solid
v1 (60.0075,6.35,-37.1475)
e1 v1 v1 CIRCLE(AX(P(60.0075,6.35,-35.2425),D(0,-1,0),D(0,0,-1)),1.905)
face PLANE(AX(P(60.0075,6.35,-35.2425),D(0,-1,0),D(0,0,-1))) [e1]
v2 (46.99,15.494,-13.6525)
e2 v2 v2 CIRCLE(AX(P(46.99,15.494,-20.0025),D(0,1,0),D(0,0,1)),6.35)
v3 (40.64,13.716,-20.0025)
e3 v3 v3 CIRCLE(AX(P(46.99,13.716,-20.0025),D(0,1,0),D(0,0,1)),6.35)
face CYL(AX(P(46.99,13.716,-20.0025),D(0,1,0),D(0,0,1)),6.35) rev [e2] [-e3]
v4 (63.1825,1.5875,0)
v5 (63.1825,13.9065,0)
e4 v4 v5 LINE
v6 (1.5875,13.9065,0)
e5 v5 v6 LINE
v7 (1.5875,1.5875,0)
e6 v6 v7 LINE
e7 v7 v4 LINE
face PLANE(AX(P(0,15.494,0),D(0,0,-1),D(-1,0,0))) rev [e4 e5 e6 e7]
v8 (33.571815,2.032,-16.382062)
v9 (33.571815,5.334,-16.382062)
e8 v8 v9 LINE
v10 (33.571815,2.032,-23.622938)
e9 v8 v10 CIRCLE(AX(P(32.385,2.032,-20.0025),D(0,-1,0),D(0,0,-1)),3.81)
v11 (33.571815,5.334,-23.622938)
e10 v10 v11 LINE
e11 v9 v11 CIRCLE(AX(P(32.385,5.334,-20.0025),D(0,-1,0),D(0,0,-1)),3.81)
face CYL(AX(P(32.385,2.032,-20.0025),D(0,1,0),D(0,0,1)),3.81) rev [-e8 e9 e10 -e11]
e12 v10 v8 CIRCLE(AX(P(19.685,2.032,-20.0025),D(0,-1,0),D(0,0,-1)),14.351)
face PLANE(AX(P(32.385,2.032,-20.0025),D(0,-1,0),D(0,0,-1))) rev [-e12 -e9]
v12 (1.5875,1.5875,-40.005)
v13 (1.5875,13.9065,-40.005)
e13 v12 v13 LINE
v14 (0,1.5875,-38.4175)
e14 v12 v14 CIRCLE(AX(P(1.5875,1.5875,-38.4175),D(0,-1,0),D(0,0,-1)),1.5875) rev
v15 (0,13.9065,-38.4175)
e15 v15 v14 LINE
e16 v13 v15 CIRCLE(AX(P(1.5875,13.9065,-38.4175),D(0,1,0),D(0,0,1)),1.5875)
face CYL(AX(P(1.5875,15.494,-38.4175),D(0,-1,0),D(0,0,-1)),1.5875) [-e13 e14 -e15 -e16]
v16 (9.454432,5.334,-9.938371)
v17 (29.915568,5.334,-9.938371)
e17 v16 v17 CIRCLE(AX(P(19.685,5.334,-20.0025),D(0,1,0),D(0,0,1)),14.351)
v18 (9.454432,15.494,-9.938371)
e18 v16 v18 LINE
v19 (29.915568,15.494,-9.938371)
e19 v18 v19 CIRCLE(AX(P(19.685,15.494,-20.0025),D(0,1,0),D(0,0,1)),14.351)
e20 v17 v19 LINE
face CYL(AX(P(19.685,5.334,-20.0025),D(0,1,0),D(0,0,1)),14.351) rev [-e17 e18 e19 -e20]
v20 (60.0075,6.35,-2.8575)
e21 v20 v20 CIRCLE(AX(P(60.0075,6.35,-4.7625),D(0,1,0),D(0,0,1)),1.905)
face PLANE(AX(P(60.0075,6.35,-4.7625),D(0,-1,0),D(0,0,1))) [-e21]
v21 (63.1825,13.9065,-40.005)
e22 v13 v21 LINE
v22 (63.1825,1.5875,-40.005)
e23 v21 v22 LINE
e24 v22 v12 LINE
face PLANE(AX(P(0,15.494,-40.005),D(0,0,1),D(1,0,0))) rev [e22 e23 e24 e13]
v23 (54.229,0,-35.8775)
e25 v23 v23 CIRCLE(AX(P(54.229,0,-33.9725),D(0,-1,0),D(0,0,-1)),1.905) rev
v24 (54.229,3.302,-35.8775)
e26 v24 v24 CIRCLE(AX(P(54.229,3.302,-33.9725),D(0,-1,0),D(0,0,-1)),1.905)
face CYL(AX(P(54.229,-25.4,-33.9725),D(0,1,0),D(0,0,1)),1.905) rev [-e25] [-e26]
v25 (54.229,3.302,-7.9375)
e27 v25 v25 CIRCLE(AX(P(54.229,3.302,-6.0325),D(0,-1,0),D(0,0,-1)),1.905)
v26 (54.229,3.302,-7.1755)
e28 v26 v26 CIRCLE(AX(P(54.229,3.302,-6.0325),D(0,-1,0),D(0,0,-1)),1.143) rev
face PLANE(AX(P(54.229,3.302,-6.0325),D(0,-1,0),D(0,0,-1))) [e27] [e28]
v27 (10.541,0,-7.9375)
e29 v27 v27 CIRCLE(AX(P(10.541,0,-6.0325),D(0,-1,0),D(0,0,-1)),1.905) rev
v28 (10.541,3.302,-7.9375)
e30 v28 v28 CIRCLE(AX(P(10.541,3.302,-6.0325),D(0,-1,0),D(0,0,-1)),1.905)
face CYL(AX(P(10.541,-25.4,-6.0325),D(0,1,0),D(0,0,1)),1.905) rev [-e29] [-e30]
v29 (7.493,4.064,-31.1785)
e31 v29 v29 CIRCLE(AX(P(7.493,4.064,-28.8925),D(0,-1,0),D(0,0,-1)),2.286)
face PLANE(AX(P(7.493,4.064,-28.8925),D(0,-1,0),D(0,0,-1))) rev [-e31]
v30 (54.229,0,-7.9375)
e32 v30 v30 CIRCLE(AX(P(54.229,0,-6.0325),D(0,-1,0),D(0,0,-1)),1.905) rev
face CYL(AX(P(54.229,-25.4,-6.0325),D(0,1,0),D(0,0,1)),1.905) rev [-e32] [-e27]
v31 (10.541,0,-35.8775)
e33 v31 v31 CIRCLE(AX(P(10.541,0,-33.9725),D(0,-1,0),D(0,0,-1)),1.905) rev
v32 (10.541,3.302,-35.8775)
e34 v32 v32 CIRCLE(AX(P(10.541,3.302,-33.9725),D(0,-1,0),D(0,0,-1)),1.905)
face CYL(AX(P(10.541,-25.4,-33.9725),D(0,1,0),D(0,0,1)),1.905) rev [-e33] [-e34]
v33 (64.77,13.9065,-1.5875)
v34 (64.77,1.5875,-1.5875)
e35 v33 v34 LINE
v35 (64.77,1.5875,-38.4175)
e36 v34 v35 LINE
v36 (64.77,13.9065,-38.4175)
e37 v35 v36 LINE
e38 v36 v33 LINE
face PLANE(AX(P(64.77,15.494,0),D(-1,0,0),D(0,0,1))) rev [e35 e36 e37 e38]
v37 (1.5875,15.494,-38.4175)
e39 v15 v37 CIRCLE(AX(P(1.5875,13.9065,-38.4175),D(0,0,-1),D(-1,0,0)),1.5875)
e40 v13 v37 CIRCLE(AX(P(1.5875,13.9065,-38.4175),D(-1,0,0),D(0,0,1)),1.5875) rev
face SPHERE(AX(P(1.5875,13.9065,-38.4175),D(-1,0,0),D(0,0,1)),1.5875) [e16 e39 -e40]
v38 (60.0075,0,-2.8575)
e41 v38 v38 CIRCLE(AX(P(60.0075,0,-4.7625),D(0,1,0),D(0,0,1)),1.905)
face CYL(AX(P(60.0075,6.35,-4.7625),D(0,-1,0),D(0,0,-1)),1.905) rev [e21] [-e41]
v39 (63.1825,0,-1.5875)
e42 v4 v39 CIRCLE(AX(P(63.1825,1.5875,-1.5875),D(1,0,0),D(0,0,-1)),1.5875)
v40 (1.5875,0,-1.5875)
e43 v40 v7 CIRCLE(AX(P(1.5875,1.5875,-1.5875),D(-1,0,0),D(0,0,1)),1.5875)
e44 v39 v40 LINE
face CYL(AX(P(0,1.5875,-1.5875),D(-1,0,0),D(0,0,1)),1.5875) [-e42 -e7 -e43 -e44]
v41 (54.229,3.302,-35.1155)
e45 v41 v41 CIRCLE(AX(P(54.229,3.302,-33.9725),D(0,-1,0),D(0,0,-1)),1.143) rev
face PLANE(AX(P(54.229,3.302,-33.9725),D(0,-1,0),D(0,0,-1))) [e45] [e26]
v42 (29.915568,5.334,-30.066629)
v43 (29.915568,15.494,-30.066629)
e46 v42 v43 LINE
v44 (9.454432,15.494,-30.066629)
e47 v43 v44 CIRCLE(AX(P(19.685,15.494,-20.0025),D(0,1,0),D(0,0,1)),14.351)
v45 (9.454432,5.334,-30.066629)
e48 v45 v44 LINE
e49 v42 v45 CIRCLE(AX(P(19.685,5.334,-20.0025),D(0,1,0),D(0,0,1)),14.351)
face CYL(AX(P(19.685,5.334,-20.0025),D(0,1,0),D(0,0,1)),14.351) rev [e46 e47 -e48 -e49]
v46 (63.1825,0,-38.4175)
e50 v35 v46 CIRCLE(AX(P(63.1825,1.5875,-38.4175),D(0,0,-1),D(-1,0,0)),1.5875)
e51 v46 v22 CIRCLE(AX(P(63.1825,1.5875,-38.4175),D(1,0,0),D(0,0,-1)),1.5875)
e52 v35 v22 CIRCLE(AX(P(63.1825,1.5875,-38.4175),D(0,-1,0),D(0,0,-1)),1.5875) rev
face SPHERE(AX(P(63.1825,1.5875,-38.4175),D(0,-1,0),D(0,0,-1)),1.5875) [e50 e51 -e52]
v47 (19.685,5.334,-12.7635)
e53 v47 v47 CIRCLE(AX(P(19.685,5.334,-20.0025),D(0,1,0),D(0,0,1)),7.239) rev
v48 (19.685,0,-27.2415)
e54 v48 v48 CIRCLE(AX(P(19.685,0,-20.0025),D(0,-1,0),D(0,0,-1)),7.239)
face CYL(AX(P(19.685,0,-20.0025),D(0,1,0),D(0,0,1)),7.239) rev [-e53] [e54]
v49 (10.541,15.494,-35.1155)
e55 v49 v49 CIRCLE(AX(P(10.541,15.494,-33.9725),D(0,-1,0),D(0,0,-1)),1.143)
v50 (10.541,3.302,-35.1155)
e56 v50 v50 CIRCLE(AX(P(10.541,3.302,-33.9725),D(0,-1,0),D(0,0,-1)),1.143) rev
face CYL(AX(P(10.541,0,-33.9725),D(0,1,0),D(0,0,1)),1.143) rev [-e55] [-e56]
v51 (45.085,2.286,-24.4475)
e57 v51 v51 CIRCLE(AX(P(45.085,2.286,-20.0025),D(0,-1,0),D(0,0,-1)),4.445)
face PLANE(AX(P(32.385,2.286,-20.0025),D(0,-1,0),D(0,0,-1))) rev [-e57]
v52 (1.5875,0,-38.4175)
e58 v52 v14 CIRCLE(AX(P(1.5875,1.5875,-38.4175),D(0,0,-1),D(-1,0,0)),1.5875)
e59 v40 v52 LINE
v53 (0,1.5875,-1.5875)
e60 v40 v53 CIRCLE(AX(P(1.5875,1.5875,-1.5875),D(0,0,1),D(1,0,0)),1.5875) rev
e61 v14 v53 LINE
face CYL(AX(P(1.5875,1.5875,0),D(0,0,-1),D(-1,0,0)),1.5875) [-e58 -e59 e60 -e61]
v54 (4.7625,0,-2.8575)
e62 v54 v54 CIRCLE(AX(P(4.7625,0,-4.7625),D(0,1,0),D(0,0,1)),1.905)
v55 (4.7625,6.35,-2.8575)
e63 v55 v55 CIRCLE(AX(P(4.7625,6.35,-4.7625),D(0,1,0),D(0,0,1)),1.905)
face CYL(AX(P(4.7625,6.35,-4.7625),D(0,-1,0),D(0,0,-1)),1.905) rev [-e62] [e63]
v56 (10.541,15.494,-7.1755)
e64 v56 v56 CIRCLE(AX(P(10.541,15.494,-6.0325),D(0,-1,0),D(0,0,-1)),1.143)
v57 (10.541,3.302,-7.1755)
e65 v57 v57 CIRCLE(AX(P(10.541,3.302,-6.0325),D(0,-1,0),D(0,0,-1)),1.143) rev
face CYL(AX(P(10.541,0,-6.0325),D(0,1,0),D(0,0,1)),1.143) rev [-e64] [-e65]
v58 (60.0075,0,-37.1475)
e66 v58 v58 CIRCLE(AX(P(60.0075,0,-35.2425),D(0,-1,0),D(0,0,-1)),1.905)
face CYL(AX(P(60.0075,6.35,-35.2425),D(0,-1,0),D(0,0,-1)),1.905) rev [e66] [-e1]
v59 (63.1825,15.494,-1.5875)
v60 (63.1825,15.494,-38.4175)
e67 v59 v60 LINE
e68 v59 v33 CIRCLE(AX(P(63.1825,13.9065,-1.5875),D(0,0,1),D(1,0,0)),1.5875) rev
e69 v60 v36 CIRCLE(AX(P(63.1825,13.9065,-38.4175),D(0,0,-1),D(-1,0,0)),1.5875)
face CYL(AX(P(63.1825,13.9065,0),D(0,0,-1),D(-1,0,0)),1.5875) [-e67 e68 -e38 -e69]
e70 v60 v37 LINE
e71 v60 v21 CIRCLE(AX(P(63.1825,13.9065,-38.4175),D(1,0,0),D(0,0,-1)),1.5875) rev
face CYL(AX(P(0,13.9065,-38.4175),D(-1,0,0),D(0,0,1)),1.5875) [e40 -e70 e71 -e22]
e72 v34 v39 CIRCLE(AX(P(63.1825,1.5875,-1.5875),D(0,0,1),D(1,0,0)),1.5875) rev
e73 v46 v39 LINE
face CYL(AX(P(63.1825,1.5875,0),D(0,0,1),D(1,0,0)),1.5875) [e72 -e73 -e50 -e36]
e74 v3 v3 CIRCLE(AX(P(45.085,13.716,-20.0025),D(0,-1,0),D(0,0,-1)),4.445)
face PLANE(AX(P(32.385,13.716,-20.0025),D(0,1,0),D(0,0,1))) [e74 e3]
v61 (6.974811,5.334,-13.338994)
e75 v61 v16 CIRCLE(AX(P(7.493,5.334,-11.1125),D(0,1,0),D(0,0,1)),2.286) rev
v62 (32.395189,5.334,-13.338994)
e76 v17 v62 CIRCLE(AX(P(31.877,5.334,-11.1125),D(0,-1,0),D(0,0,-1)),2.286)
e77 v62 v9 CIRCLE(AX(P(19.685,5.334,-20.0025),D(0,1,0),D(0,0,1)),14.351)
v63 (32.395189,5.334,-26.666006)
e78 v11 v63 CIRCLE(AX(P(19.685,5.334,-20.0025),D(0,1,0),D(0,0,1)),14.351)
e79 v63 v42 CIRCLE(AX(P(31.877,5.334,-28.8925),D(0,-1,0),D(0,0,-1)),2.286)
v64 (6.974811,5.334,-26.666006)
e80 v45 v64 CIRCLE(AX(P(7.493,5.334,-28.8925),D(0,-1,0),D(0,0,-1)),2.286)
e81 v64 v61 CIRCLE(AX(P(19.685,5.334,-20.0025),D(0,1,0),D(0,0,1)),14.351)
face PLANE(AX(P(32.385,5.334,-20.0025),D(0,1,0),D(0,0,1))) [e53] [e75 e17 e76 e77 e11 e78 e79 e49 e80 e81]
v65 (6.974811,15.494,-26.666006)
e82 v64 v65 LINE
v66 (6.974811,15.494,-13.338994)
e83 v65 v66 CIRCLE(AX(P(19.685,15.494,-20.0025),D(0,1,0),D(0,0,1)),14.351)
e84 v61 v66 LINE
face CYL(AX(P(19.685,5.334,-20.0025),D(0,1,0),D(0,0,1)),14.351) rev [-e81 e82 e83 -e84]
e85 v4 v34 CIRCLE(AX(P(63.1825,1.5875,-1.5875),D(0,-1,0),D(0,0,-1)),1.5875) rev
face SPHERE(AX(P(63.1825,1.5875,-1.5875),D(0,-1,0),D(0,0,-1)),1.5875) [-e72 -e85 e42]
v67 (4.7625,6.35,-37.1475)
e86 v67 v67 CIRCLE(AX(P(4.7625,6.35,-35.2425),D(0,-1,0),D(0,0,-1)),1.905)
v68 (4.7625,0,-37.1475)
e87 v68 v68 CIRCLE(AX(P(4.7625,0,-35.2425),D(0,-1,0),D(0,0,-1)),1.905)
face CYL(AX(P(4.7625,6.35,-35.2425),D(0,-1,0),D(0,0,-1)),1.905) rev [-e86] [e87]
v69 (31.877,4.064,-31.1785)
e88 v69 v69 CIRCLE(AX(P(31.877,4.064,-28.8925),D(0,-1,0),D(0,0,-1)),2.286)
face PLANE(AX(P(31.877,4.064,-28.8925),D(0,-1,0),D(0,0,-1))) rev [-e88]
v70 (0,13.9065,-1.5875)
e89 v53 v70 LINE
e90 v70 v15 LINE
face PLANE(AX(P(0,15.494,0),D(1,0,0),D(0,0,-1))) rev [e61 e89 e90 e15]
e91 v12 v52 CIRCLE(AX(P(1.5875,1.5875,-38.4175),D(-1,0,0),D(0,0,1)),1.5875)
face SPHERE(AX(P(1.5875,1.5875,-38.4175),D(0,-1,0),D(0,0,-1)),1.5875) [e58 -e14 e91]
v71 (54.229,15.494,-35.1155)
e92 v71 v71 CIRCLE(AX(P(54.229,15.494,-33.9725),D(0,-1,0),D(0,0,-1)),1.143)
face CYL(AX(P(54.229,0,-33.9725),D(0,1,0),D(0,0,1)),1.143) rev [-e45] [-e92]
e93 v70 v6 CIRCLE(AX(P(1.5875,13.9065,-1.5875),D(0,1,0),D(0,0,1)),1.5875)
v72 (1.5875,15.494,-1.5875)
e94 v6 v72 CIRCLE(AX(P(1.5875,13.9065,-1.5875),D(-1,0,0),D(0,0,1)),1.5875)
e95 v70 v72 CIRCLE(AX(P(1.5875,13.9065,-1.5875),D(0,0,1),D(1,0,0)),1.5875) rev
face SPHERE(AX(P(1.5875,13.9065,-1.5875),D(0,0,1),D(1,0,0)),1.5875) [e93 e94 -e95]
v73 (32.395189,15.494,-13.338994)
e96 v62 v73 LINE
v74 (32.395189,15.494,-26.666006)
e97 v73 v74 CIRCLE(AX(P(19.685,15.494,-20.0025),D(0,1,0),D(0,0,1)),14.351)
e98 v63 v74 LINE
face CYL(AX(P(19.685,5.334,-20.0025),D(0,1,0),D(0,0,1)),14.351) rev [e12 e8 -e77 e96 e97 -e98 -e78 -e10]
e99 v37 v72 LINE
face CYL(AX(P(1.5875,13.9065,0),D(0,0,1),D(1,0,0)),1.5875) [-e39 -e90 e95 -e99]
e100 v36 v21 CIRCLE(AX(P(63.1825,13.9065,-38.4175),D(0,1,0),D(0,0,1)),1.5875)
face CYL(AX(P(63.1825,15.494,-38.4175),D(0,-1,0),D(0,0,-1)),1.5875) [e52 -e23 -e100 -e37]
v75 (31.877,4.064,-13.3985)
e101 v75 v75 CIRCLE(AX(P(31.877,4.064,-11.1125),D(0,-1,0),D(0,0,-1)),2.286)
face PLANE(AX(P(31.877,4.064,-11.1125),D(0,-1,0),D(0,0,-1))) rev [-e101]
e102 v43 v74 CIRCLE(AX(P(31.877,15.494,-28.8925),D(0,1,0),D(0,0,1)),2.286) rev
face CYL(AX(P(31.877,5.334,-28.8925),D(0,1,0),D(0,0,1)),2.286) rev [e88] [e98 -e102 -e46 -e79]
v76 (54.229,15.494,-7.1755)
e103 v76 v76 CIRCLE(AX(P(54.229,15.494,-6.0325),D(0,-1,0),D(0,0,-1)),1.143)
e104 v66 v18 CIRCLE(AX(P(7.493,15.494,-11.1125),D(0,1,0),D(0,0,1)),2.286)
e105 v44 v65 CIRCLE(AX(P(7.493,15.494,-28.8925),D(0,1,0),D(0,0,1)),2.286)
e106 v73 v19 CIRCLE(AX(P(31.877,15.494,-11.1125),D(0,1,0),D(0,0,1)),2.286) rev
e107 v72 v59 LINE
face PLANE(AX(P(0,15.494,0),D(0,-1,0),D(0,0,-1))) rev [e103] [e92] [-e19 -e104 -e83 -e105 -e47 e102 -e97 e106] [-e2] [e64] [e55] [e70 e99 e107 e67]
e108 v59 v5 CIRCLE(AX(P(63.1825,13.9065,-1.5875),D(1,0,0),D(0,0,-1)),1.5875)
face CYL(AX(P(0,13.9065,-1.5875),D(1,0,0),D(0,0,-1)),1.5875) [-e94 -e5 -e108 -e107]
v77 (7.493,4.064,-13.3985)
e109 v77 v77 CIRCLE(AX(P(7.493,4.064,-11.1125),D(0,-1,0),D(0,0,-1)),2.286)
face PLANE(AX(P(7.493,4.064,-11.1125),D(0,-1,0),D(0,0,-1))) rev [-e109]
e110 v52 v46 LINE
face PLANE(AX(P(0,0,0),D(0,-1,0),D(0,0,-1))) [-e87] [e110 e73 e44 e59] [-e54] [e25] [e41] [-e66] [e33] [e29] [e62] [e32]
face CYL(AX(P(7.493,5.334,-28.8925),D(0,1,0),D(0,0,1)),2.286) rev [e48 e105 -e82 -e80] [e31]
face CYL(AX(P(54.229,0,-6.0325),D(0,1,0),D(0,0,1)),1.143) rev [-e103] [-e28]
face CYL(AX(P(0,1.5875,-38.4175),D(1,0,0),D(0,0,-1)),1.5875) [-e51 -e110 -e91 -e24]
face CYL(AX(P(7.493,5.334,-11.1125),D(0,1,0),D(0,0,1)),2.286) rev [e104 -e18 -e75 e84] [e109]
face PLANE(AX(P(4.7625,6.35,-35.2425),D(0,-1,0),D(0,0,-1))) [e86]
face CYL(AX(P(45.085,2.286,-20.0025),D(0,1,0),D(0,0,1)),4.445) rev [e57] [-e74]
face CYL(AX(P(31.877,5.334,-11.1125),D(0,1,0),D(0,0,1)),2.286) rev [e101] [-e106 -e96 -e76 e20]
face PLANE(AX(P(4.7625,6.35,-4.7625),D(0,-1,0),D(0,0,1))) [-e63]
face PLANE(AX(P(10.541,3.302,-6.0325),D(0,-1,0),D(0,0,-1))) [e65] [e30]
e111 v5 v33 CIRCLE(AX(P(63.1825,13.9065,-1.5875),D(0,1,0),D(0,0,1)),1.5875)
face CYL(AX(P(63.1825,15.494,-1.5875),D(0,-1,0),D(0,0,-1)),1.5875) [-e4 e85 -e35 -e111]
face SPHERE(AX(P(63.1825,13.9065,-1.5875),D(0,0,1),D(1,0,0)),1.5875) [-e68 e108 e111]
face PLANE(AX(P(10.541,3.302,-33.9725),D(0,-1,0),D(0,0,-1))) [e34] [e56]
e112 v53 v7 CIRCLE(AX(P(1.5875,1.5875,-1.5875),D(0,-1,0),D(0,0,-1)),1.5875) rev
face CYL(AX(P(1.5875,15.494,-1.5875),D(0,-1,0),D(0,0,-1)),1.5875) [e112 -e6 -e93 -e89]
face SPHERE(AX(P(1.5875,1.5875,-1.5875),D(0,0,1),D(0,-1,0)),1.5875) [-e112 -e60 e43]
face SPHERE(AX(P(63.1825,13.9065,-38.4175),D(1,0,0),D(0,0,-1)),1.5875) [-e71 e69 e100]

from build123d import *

# Parameters (mm, degrees)
SKETCH1_W             = 64.77
SKETCH1_H             = 40.005
BOSS_EXTRUDE1_DEPTH   = 15.494
CAVITY1_START         = 5.334
CAVITY1_OUTLINE_R     = 1.143
CAVITY1_OUTLINE_R_2   = 4.445
CAVITY1_DEPTH         = 10.16
CAVITY1_2_OUTLINE_R   = 1.143
CAVITY1_2_OUTLINE_R_2 = 7.239
CAVITY1_2_DEPTH       = 5.334
CAVITY1_START_2       = 2.286
CAVITY1_3_OUTLINE_R   = 4.445
CAVITY1_3_DEPTH       = 3.048
CAVITY1_START_3       = 13.716
CAVITY1_4_DEPTH       = 1.778
CAVITY1_5_OUTLINE_R   = 1.905
CAVITY1_5_OUTLINE_R_2 = 1.143
CAVITY1_5_DEPTH       = 3.302
CAVITY1_START_4       = 4.064
CAVITY1_6_OUTLINE_R   = 2.286
CAVITY1_6_DEPTH       = 1.27
CAVITY1_START_5       = 2.032
CAVITY1_7_DEPTH       = 0.254
SKETCH3_R             = 1.905
CUT_EXTRUDE1_DEPTH    = 6.35
FILLET1_R             = 1.5875


# Read off the part's stored shape, not the designer's step: Cavity1
with BuildPart() as part:
    # Sketch1 → Boss-Extrude1 (new body)
    with BuildSketch(Plane(origin=(0, 0, 0), x_dir=(1, 0, 0), z_dir=(0, 1, 0))):
        with Locations((32.385, 20.0025)):
            Rectangle(SKETCH1_W, SKETCH1_H)
    extrude(amount=BOSS_EXTRUDE1_DEPTH)

    # Cavity1 outline → Cavity1 (cut)
    with BuildSketch(Plane(origin=(0, 0, 0), x_dir=(1, 0, 0), z_dir=(0, 1, 0)).offset(CAVITY1_START)):
        with Locations((10.541, 6.0325)):
            Circle(CAVITY1_OUTLINE_R)
        with BuildLine():
            ThreePointArc((9.454432496, 9.938371148), (19.685, 5.6515), (29.915567504, 9.938371148))
            ThreePointArc((29.915567504, 9.938371148), (33.724105214, 9.765652448), (32.395188518, 13.338994253))
            ThreePointArc((32.395188518, 13.338994253), (34.036, 20.0025), (32.395188518, 26.666005747))
            ThreePointArc((32.395188518, 26.666005747), (33.724105214, 30.239347552), (29.915567504, 30.066628852))
            ThreePointArc((29.915567504, 30.066628852), (19.685, 34.3535), (9.454432496, 30.066628852))
            ThreePointArc((9.454432496, 30.066628852), (5.645894786, 30.239347552), (6.974811482, 26.666005747))
            ThreePointArc((6.974811482, 26.666005747), (5.334, 20.0025), (6.974811482, 13.338994253))
            ThreePointArc((6.974811482, 13.338994253), (5.645894786, 9.765652448), (9.454432496, 9.938371148))
        make_face()
        with Locations((54.229, 6.0325)):
            Circle(CAVITY1_OUTLINE_R)
        with Locations((45.085, 20.0025)):
            Circle(CAVITY1_OUTLINE_R_2)
        with Locations((10.541, 33.9725)):
            Circle(CAVITY1_OUTLINE_R)
        with Locations((54.229, 33.9725)):
            Circle(CAVITY1_OUTLINE_R)
    extrude(amount=CAVITY1_DEPTH, mode=Mode.SUBTRACT)

    # Cavity1 2 outline → Cavity1 2 (cut)
    with BuildSketch(Plane(origin=(0, 0, 0), x_dir=(1, 0, 0), z_dir=(0, 1, 0))):
        with Locations((10.541, 6.0325)):
            Circle(CAVITY1_2_OUTLINE_R)
        with Locations((54.229, 6.0325)):
            Circle(CAVITY1_2_OUTLINE_R)
        with Locations((10.541, 33.9725)):
            Circle(CAVITY1_2_OUTLINE_R)
        with Locations((54.229, 33.9725)):
            Circle(CAVITY1_2_OUTLINE_R)
        with Locations((19.685, 20.0025)):
            Circle(CAVITY1_2_OUTLINE_R_2)
    extrude(amount=CAVITY1_2_DEPTH, mode=Mode.SUBTRACT)

    # Cavity1 3 outline → Cavity1 3 (cut)
    with BuildSketch(Plane(origin=(0, 0, 0), x_dir=(1, 0, 0), z_dir=(0, 1, 0)).offset(CAVITY1_START_2)):
        with BuildLine():
            ThreePointArc((33.571815, 23.62293784), (28.575, 20.0025), (33.571815, 16.38206216))
            ThreePointArc((33.571815, 16.38206216), (34.036, 20.0025), (33.571815, 23.62293784))
        make_face()
        with Locations((45.085, 20.0025)):
            Circle(CAVITY1_3_OUTLINE_R)
    extrude(amount=CAVITY1_3_DEPTH, mode=Mode.SUBTRACT)

    # Cavity1 4 outline → Cavity1 4 (cut)
    with BuildSketch(Plane(origin=(0, 0, 0), x_dir=(1, 0, 0), z_dir=(0, 1, 0)).offset(CAVITY1_START_3)):
        with BuildLine():
            Line((44.074058668, 15.673987251), (45.983725966, 13.732738237))
            ThreePointArc((45.983725966, 13.732738237), (49.973349777, 14.396955949), (52.752669641, 17.335265738))
            Line((52.752669641, 17.335265738), (49.261068942, 18.479846661))
            ThreePointArc((49.261068942, 18.479846661), (47.1998806, 16.092857427), (44.074058668, 15.673987251))
        make_face()
        with BuildLine():
            ThreePointArc((40.766648336, 18.740599029), (42.59266679, 15.421456381), (45.983725966, 13.732738237))
            Line((45.983725966, 13.732738237), (44.074058668, 15.673987251))
            ThreePointArc((44.074058668, 15.673987251), (42.028662496, 16.774989185), (40.817941907, 18.757413564))
            Line((40.817941907, 18.757413564), (40.766648336, 18.740599029))
        make_face()
        with BuildLine():
            Line((49.261068942, 18.479846661), (52.752669641, 17.335265738))
            ThreePointArc((52.752669641, 17.335265738), (53.19142936, 18.636932759), (53.34, 20.0025))
            ThreePointArc((53.34, 20.0025), (53.19142936, 21.368067241), (52.752669641, 22.669734262))
            Line((52.752669641, 22.669734262), (49.261068942, 21.525153339))
            ThreePointArc((49.261068942, 21.525153339), (49.462250932, 20.775610132), (49.53, 20.0025))
            ThreePointArc((49.53, 20.0025), (49.462250932, 19.229389868), (49.261068942, 18.479846661))
        make_face()
        with BuildLine():
            ThreePointArc((40.704577582, 19.099192174), (40.73304351, 18.919450842), (40.766648336, 18.740599029))
            Line((40.766648336, 18.740599029), (40.817941907, 18.757413564))
            ThreePointArc((40.817941907, 18.757413564), (40.776510846, 18.909364048), (40.740488936, 19.062686925))
            Line((40.740488936, 19.062686925), (40.704577582, 19.099192174))
        make_face()
        with BuildLine():
            Line((49.261068942, 21.525153339), (52.752669641, 22.669734262))
            ThreePointArc((52.752669641, 22.669734262), (49.973349777, 25.608044051), (45.983725966, 26.272261763))
            Line((45.983725966, 26.272261763), (44.074058668, 24.33101275))
            ThreePointArc((44.074058668, 24.33101275), (47.1998806, 23.912142573), (49.261068942, 21.525153339))
        make_face()
        with BuildLine():
            Line((40.817941907, 21.247586436), (40.766648336, 21.264400971))
            ThreePointArc((40.766648336, 21.264400971), (40.73304351, 21.085549158), (40.704577582, 20.905807826))
            Line((40.704577582, 20.905807826), (40.740488936, 20.942313075))
            ThreePointArc((40.740488936, 20.942313075), (40.776510846, 21.095635952), (40.817941907, 21.247586436))
        make_face()
        with BuildLine():
            ThreePointArc((45.983725966, 26.272261763), (42.59266679, 24.583543619), (40.766648336, 21.264400971))
            Line((40.766648336, 21.264400971), (40.817941907, 21.247586436))
            ThreePointArc((40.817941907, 21.247586436), (42.028662496, 23.230010815), (44.074058668, 24.33101275))
            Line((44.074058668, 24.33101275), (45.983725966, 26.272261763))
        make_face()
        with BuildLine():
            ThreePointArc((40.64, 20.0025), (40.656164971, 19.549693393), (40.704577582, 19.099192174))
            Line((40.704577582, 19.099192174), (40.740488936, 19.062686925))
            ThreePointArc((40.740488936, 19.062686925), (40.665193631, 19.529914917), (40.64, 20.0025))
        make_face()
        with BuildLine():
            Line((40.740488936, 20.942313075), (40.704577582, 20.905807826))
            ThreePointArc((40.704577582, 20.905807826), (40.656164971, 20.455306607), (40.64, 20.0025))
            ThreePointArc((40.64, 20.0025), (40.665193631, 20.475085083), (40.740488936, 20.942313075))
        make_face()
    extrude(amount=CAVITY1_4_DEPTH, mode=Mode.SUBTRACT)

    # Cavity1 5 outline → Cavity1 5 (cut)
    # profile 1 of 4: a face of its own
    with BuildSketch(Plane(origin=(0, 0, 0), x_dir=(1, 0, 0), z_dir=(0, 1, 0))):
        with Locations((10.541, 6.0325)):
            Circle(CAVITY1_5_OUTLINE_R)
        with Locations((10.541, 6.0325)):
            Circle(CAVITY1_5_OUTLINE_R_2, mode=Mode.SUBTRACT)
    # profile 2 of 4: a face of its own
    with BuildSketch(Plane(origin=(0, 0, 0), x_dir=(1, 0, 0), z_dir=(0, 1, 0))):
        with Locations((54.229, 6.0325)):
            Circle(CAVITY1_5_OUTLINE_R)
        with Locations((54.229, 6.0325)):
            Circle(CAVITY1_5_OUTLINE_R_2, mode=Mode.SUBTRACT)
    # profile 3 of 4: a face of its own
    with BuildSketch(Plane(origin=(0, 0, 0), x_dir=(1, 0, 0), z_dir=(0, 1, 0))):
        with Locations((10.541, 33.9725)):
            Circle(CAVITY1_5_OUTLINE_R)
        with Locations((10.541, 33.9725)):
            Circle(CAVITY1_5_OUTLINE_R_2, mode=Mode.SUBTRACT)
    # profile 4 of 4: a face of its own
    with BuildSketch(Plane(origin=(0, 0, 0), x_dir=(1, 0, 0), z_dir=(0, 1, 0))):
        with Locations((54.229, 33.9725)):
            Circle(CAVITY1_5_OUTLINE_R)
        with Locations((54.229, 33.9725)):
            Circle(CAVITY1_5_OUTLINE_R_2, mode=Mode.SUBTRACT)
    extrude(amount=CAVITY1_5_DEPTH, mode=Mode.SUBTRACT)

    # Cavity1 6 outline → Cavity1 6 (cut)
    with BuildSketch(Plane(origin=(0, 0, 0), x_dir=(1, 0, 0), z_dir=(0, 1, 0)).offset(CAVITY1_START_4)):
        with Locations((7.493, 11.1125)):
            Circle(CAVITY1_6_OUTLINE_R)
        with Locations((31.877, 11.1125)):
            Circle(CAVITY1_6_OUTLINE_R)
        with Locations((7.493, 28.8925)):
            Circle(CAVITY1_6_OUTLINE_R)
        with Locations((31.877, 28.8925)):
            Circle(CAVITY1_6_OUTLINE_R)
    extrude(amount=CAVITY1_6_DEPTH, mode=Mode.SUBTRACT)

    # Cavity1 7 outline → Cavity1 7 (cut)
    with BuildSketch(Plane(origin=(0, 0, 0), x_dir=(1, 0, 0), z_dir=(0, 1, 0)).offset(CAVITY1_START_5)):
        with BuildLine():
            ThreePointArc((33.571815, 23.62293784), (28.575, 20.0025), (33.571815, 16.38206216))
            ThreePointArc((33.571815, 16.38206216), (34.036, 20.0025), (33.571815, 23.62293784))
        make_face()
    extrude(amount=CAVITY1_7_DEPTH, mode=Mode.SUBTRACT)

    # Sketch3 → Cut-Extrude1 (cut)
    with BuildSketch(Plane.XZ):
        with Locations(Location((4.7625, -35.2425, 0), (0, 0, 270))):
            Circle(SKETCH3_R)
        with Locations(Location((60.0075, -35.2425, 0), (0, 0, 270))):
            Circle(SKETCH3_R)
    cut_extrude1 = extrude(amount=-CUT_EXTRUDE1_DEPTH, mode=Mode.SUBTRACT)

    # Mirror3: Cut-Extrude1 across plane
    add(cut_extrude1.mirror(Plane(origin=(0, 0, -20.0025), x_dir=(1, 0, 0), z_dir=(0, 0, -1))), mode=Mode.SUBTRACT)

    # Fillet1
    fillet1_edges = [part.edges().sort_by_distance(p)[0] for p in [
        (64.77, 15.494, -20.0025),
        (32.385, 15.494, -40.005),
        (0, 15.494, -20.0025),
        (32.385, 0, -40.005),
        (64.77, 0, -20.0025),
        (32.385, 0, 0),
        (0, 0, -20.0025),
        (0, 7.747, -40.005),
        (64.77, 7.747, -40.005),
        (64.77, 7.747, 0),
        (0, 7.747, 0),
        (32.385, 15.494, 0),
    ]]
    fillet(fillet1_edges, radius=FILLET1_R)


solid = part.part
